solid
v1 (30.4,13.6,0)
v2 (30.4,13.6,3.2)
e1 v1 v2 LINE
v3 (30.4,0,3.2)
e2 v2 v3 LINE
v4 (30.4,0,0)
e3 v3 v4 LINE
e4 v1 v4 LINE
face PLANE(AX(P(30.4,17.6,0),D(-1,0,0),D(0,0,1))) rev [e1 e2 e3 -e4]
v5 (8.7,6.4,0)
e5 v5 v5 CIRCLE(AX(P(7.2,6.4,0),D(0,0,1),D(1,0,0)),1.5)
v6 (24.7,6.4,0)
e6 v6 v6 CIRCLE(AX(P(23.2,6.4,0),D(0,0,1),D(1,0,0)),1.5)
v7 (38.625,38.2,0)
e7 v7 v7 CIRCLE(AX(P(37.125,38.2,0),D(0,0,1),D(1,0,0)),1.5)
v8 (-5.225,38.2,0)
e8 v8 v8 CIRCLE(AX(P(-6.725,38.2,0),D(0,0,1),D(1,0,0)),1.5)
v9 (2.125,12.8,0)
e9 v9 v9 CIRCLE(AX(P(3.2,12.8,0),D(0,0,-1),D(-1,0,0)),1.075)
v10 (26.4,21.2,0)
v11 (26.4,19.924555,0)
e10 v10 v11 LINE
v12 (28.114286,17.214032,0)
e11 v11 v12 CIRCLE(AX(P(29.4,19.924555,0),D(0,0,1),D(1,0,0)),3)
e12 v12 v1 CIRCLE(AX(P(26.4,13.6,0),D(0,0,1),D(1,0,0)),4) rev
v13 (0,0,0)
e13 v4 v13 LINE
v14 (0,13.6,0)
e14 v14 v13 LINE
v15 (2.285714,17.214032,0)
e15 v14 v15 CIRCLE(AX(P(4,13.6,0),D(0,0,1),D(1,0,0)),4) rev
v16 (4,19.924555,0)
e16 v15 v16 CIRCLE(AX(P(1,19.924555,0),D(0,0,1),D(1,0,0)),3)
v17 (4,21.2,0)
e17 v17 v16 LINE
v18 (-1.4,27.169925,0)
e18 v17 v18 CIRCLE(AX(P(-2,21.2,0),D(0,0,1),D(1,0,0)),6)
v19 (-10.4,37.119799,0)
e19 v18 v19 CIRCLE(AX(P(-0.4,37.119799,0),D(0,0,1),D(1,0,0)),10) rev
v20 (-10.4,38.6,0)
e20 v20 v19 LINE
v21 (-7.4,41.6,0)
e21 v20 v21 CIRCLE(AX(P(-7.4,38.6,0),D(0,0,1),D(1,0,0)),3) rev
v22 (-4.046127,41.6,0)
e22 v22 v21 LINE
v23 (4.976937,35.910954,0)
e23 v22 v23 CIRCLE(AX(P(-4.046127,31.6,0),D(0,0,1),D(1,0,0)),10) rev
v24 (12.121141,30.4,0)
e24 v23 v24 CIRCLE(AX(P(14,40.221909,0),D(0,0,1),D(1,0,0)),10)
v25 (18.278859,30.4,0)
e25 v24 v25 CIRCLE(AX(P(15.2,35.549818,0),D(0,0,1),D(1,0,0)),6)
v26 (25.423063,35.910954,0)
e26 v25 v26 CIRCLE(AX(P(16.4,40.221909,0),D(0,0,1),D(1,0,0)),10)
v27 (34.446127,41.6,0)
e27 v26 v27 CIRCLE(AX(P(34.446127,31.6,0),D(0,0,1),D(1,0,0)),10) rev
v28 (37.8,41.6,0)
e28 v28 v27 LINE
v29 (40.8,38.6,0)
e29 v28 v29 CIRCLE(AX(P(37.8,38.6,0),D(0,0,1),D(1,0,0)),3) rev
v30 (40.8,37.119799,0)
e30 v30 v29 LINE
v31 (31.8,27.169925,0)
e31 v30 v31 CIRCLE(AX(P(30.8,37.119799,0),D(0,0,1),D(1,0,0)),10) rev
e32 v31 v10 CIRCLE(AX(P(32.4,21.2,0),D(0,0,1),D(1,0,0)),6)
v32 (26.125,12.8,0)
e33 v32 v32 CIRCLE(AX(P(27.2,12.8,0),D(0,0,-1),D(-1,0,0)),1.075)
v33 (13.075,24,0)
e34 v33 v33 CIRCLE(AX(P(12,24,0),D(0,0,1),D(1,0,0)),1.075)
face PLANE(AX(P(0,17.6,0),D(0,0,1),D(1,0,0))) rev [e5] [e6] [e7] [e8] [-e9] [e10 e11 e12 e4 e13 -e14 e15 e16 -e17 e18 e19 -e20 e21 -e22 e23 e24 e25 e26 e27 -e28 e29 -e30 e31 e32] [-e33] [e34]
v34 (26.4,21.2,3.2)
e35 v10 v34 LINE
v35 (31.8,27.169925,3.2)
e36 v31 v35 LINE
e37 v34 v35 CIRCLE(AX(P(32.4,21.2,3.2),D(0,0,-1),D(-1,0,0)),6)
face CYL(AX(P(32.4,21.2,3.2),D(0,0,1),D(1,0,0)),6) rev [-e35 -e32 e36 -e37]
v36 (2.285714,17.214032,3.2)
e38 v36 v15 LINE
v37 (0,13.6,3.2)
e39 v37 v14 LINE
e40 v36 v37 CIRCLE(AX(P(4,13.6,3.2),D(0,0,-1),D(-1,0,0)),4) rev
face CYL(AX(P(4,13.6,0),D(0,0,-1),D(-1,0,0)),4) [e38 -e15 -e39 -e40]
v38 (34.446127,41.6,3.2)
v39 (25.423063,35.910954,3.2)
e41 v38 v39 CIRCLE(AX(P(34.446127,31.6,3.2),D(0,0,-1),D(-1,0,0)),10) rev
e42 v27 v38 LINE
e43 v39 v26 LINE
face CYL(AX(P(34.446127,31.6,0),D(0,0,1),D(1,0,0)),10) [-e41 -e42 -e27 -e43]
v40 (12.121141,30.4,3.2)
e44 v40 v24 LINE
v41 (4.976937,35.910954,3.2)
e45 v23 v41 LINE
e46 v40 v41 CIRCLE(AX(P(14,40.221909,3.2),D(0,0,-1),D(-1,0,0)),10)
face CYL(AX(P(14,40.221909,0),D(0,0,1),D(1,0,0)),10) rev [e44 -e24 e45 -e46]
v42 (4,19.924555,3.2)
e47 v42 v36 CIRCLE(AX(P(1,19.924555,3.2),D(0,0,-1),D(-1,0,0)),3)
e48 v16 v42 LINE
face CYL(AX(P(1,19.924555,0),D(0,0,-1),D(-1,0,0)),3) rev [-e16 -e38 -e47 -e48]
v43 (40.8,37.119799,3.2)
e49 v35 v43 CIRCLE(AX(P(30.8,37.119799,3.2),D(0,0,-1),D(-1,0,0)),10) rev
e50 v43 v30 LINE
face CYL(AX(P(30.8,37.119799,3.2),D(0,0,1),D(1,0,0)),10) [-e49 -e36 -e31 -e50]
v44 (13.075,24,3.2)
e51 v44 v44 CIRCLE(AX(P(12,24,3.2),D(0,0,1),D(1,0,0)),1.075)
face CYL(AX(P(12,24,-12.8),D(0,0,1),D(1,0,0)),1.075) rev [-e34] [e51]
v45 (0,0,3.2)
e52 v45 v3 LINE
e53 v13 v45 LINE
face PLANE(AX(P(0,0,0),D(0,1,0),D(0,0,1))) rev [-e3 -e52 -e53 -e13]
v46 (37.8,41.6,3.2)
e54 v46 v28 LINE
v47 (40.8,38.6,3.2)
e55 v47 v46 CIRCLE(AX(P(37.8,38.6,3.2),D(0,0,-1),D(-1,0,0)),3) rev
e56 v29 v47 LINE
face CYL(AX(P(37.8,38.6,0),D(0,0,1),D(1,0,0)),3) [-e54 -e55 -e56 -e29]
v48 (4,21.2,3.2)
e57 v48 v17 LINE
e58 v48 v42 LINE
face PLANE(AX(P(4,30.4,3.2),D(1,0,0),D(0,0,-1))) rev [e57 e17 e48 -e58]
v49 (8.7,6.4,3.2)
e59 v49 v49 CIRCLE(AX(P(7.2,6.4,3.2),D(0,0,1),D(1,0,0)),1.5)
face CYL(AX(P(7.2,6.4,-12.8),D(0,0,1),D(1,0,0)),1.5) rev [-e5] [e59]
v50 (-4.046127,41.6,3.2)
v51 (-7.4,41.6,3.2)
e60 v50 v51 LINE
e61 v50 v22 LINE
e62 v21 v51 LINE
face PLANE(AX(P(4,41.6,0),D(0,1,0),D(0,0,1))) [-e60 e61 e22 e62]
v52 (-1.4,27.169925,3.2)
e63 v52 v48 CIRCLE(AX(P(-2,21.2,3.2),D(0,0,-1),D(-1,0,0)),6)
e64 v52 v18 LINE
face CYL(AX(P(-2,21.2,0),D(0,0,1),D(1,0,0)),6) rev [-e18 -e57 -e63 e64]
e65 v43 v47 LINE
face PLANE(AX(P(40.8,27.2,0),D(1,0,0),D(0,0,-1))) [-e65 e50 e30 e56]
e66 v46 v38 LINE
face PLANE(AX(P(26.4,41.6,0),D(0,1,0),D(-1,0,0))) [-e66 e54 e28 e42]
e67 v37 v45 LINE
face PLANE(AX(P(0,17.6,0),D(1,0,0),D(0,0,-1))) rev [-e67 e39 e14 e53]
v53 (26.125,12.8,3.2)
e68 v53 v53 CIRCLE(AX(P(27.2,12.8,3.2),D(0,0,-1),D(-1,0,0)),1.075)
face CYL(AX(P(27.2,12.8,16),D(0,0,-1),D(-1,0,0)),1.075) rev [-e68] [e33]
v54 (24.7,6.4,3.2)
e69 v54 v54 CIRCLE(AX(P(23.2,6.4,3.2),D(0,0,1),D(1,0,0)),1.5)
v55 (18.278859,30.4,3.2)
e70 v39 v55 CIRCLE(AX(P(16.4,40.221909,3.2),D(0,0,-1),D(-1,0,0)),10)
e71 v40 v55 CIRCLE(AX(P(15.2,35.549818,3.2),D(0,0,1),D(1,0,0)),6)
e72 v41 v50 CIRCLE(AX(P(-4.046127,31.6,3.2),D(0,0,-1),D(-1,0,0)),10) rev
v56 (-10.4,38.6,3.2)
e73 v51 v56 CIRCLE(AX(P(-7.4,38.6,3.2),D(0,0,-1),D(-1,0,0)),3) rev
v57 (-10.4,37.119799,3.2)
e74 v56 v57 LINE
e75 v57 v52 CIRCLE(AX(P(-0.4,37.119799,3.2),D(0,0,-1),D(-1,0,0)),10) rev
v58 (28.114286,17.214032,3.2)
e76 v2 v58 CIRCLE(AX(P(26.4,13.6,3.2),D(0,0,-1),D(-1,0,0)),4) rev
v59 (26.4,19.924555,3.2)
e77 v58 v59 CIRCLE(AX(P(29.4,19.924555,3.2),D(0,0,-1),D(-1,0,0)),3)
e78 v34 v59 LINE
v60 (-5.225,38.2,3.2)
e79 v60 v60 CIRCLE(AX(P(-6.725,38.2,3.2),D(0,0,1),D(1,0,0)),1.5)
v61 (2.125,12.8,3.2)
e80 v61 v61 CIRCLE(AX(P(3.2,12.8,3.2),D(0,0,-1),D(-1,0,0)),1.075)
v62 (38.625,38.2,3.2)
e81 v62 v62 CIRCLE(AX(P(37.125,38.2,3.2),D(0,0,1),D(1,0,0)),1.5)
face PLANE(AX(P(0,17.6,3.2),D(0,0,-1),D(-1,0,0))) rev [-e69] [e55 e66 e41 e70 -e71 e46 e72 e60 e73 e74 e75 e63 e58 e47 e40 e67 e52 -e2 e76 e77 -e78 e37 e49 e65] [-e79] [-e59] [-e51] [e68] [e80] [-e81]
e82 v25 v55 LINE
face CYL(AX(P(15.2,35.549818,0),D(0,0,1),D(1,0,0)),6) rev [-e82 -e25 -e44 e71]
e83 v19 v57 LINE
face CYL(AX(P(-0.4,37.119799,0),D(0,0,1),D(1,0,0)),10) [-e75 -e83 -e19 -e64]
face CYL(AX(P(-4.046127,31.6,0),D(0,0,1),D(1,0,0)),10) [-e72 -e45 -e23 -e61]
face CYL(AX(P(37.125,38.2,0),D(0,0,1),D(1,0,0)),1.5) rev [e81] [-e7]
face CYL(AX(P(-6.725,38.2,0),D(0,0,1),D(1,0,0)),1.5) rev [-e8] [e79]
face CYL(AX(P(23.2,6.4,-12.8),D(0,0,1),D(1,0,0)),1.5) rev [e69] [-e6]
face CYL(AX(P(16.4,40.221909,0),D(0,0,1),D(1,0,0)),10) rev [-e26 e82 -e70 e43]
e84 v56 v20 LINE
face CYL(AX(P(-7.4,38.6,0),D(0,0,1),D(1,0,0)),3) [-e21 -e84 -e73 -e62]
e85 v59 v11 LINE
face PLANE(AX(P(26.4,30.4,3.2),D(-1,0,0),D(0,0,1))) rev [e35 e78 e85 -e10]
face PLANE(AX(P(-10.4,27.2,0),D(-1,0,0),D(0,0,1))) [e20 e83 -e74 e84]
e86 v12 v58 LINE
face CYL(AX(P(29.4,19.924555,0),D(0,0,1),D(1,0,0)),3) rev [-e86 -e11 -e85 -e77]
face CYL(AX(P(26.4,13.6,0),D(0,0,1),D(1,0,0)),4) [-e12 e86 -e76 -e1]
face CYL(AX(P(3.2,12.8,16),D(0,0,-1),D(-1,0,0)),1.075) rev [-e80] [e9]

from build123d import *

# Parameters (mm, degrees)
SKETCH1_W           = 30.4
SKETCH1_H           = 3.2
BOSS_EXTRUDE1_DEPTH = 17.6
SKETCH2_R           = 1.5
CUT_EXTRUDE1_DEPTH  = 16
SKETCH3_R           = 1.075
CUT_EXTRUDE2_DEPTH  = 16
SKETCH4_W           = 22.4
SKETCH4_H           = 3.2
BOSS_EXTRUDE2_DEPTH = 12.8
SKETCH5_R           = 1.075
CUT_EXTRUDE3_DEPTH  = 16
SKETCH6_W           = 14.4
SKETCH6_H           = 14.4
BOSS_EXTRUDE3_DEPTH = 3.2
SKETCH7_R           = 1.5
CUT_EXTRUDE4_DEPTH  = 59.356147919
SKETCH8_R           = 6
CUT_EXTRUDE5_DEPTH  = 3.2
FILLET5_R           = 4
FILLET6_R           = 10
FILLET7_R           = 6
FILLET8_R           = 10
FILLET9_R           = 3
FILLET10_R          = 10
FILLET12_R          = 3


# Some blends are built 0.0001 mm under size
with BuildPart() as part:
    # Sketch1 → Boss-Extrude1 (new body)
    with BuildSketch(Plane(origin=(0, 0, 0), x_dir=(1, 0, 0), z_dir=(0, 1, 0))):
        with Locations((15.2, -1.6)):
            Rectangle(SKETCH1_W, SKETCH1_H)
    extrude(amount=BOSS_EXTRUDE1_DEPTH)

    # Sketch2 → Cut-Extrude1 (cut)
    with BuildSketch(Plane.XY.offset(3.2)):
        with Locations((23.2, 6.4)):
            Circle(SKETCH2_R)
        with Locations((7.2, 6.4)):
            Circle(SKETCH2_R)
    extrude(amount=-CUT_EXTRUDE1_DEPTH, mode=Mode.SUBTRACT)

    # Sketch3 → Cut-Extrude2 (cut)
    with BuildSketch(Plane(origin=(0, 0, 0), x_dir=(-1, 0, 0), z_dir=(0, 0, -1))):
        with Locations((-27.2, 12.8)):
            Circle(SKETCH3_R)
        with Locations((-3.2, 12.8)):
            Circle(SKETCH3_R)
    extrude(amount=-CUT_EXTRUDE2_DEPTH, mode=Mode.SUBTRACT)

    # Sketch4 → Boss-Extrude2 (add)
    with BuildSketch(Plane(origin=(0, 17.6, 0), x_dir=(1, 0, 0), z_dir=(0, 1, 0))):
        with Locations((15.2, -1.6)):
            Rectangle(SKETCH4_W, SKETCH4_H)
    extrude(amount=BOSS_EXTRUDE2_DEPTH)

    # Sketch5 → Cut-Extrude3 (cut)
    with BuildSketch(Plane.XY.offset(3.2)):
        with Locations((12, 24)):
            Circle(SKETCH5_R)
    extrude(amount=-CUT_EXTRUDE3_DEPTH, mode=Mode.SUBTRACT)

    # Sketch6 → Boss-Extrude3 (add)
    with BuildSketch(Plane.XY.offset(3.2)):
        with Locations((-3.2, 34.4)):
            Rectangle(SKETCH6_W, SKETCH6_H)
        with Locations((33.6, 34.4)):
            Rectangle(SKETCH6_W, SKETCH6_H)
    extrude(amount=-BOSS_EXTRUDE3_DEPTH)

    # Sketch7 → Cut-Extrude4 (cut, through all)
    with BuildSketch(Plane.XY.offset(3.2)):
        with Locations((-6.725, 38.2)):
            Circle(SKETCH7_R)
        with Locations((37.125, 38.2)):
            Circle(SKETCH7_R)
    extrude(amount=-CUT_EXTRUDE4_DEPTH, mode=Mode.SUBTRACT)

    # Sketch8 → Cut-Extrude5 (cut)
    with BuildSketch(Plane.XY.offset(3.2)):
        with Locations((15.2, 35.549818305)):
            Circle(SKETCH8_R)
    extrude(amount=-CUT_EXTRUDE5_DEPTH, mode=Mode.SUBTRACT)

    # Fillet5
    fillet5_edges = [part.edges().sort_by_distance(p)[0] for p in [
        (0, 17.6, 1.6),
        (30.4, 17.6, 1.6),
    ]]
    fillet(fillet5_edges, radius=FILLET5_R - 0.0001)  # a hair under: the kernel refuses the full size

    # Fillet6
    # the kernel refuses this fillet: 10 mm, written as the material it adds along each edge
    with BuildSketch(Plane(origin=(26.4, 30.4, 3.2), x_dir=(0, 1, 0), z_dir=(0, 0, -1)), Plane(origin=(4, 30.4, 0), x_dir=(0, 1, 0), z_dir=(0, 0, 1))) as fillet6_piece_1:
        with BuildLine():
            CenterArc((9.821908657, -10), FILLET6_R, 90, 79.170567871)
            Line((0, -8.121141214), (-0.196438173, -8.083564039))
            ThreePointArc((-0.196438173, -8.083564039), (-0.2, -4.060570607), (-0.2, 0))
            Line((-0.2, 0), (0, 0.2))
            Line((0, 0.2), (9.821908657, 0.2))
            Line((9.821908657, 0.2), (9.821908657, 0))
        make_face()
    extrude(amount=3.2)

    # Fillet7
    fillet7_edges = [part.edges().sort_by_distance(p)[0] for p in [
        (4, 27.2, 1.6),
        (26.4, 27.2, 1.6),
    ]]
    fillet(fillet7_edges, radius=FILLET7_R)

    # Fillet8
    fillet8_edges = [part.edges().sort_by_distance(p)[0] for p in [
        (40.8, 27.2, 1.6),
        (-10.4, 27.2, 1.6),
    ]]
    fillet(fillet8_edges, radius=FILLET8_R)

    # Fillet9
    fillet9_edges = [part.edges().sort_by_distance(p)[0] for p in [
        (-10.4, 41.6, 1.6),
        (40.8, 41.6, 1.6),
    ]]
    fillet(fillet9_edges, radius=FILLET9_R)

    # Fillet10
    fillet10_edges = [part.edges().sort_by_distance(p)[0] for p in [
        (26.4, 41.6, 1.6),
        (4, 41.6, 1.6),
    ]]
    fillet(fillet10_edges, radius=FILLET10_R)

    # Fillet12
    fillet12_edges = [part.edges().sort_by_distance(p)[0] for p in [
        (4, 17.6, 1.6),
        (26.4, 17.6, 1.6),
    ]]
    fillet(fillet12_edges, radius=FILLET12_R)


solid = part.part
